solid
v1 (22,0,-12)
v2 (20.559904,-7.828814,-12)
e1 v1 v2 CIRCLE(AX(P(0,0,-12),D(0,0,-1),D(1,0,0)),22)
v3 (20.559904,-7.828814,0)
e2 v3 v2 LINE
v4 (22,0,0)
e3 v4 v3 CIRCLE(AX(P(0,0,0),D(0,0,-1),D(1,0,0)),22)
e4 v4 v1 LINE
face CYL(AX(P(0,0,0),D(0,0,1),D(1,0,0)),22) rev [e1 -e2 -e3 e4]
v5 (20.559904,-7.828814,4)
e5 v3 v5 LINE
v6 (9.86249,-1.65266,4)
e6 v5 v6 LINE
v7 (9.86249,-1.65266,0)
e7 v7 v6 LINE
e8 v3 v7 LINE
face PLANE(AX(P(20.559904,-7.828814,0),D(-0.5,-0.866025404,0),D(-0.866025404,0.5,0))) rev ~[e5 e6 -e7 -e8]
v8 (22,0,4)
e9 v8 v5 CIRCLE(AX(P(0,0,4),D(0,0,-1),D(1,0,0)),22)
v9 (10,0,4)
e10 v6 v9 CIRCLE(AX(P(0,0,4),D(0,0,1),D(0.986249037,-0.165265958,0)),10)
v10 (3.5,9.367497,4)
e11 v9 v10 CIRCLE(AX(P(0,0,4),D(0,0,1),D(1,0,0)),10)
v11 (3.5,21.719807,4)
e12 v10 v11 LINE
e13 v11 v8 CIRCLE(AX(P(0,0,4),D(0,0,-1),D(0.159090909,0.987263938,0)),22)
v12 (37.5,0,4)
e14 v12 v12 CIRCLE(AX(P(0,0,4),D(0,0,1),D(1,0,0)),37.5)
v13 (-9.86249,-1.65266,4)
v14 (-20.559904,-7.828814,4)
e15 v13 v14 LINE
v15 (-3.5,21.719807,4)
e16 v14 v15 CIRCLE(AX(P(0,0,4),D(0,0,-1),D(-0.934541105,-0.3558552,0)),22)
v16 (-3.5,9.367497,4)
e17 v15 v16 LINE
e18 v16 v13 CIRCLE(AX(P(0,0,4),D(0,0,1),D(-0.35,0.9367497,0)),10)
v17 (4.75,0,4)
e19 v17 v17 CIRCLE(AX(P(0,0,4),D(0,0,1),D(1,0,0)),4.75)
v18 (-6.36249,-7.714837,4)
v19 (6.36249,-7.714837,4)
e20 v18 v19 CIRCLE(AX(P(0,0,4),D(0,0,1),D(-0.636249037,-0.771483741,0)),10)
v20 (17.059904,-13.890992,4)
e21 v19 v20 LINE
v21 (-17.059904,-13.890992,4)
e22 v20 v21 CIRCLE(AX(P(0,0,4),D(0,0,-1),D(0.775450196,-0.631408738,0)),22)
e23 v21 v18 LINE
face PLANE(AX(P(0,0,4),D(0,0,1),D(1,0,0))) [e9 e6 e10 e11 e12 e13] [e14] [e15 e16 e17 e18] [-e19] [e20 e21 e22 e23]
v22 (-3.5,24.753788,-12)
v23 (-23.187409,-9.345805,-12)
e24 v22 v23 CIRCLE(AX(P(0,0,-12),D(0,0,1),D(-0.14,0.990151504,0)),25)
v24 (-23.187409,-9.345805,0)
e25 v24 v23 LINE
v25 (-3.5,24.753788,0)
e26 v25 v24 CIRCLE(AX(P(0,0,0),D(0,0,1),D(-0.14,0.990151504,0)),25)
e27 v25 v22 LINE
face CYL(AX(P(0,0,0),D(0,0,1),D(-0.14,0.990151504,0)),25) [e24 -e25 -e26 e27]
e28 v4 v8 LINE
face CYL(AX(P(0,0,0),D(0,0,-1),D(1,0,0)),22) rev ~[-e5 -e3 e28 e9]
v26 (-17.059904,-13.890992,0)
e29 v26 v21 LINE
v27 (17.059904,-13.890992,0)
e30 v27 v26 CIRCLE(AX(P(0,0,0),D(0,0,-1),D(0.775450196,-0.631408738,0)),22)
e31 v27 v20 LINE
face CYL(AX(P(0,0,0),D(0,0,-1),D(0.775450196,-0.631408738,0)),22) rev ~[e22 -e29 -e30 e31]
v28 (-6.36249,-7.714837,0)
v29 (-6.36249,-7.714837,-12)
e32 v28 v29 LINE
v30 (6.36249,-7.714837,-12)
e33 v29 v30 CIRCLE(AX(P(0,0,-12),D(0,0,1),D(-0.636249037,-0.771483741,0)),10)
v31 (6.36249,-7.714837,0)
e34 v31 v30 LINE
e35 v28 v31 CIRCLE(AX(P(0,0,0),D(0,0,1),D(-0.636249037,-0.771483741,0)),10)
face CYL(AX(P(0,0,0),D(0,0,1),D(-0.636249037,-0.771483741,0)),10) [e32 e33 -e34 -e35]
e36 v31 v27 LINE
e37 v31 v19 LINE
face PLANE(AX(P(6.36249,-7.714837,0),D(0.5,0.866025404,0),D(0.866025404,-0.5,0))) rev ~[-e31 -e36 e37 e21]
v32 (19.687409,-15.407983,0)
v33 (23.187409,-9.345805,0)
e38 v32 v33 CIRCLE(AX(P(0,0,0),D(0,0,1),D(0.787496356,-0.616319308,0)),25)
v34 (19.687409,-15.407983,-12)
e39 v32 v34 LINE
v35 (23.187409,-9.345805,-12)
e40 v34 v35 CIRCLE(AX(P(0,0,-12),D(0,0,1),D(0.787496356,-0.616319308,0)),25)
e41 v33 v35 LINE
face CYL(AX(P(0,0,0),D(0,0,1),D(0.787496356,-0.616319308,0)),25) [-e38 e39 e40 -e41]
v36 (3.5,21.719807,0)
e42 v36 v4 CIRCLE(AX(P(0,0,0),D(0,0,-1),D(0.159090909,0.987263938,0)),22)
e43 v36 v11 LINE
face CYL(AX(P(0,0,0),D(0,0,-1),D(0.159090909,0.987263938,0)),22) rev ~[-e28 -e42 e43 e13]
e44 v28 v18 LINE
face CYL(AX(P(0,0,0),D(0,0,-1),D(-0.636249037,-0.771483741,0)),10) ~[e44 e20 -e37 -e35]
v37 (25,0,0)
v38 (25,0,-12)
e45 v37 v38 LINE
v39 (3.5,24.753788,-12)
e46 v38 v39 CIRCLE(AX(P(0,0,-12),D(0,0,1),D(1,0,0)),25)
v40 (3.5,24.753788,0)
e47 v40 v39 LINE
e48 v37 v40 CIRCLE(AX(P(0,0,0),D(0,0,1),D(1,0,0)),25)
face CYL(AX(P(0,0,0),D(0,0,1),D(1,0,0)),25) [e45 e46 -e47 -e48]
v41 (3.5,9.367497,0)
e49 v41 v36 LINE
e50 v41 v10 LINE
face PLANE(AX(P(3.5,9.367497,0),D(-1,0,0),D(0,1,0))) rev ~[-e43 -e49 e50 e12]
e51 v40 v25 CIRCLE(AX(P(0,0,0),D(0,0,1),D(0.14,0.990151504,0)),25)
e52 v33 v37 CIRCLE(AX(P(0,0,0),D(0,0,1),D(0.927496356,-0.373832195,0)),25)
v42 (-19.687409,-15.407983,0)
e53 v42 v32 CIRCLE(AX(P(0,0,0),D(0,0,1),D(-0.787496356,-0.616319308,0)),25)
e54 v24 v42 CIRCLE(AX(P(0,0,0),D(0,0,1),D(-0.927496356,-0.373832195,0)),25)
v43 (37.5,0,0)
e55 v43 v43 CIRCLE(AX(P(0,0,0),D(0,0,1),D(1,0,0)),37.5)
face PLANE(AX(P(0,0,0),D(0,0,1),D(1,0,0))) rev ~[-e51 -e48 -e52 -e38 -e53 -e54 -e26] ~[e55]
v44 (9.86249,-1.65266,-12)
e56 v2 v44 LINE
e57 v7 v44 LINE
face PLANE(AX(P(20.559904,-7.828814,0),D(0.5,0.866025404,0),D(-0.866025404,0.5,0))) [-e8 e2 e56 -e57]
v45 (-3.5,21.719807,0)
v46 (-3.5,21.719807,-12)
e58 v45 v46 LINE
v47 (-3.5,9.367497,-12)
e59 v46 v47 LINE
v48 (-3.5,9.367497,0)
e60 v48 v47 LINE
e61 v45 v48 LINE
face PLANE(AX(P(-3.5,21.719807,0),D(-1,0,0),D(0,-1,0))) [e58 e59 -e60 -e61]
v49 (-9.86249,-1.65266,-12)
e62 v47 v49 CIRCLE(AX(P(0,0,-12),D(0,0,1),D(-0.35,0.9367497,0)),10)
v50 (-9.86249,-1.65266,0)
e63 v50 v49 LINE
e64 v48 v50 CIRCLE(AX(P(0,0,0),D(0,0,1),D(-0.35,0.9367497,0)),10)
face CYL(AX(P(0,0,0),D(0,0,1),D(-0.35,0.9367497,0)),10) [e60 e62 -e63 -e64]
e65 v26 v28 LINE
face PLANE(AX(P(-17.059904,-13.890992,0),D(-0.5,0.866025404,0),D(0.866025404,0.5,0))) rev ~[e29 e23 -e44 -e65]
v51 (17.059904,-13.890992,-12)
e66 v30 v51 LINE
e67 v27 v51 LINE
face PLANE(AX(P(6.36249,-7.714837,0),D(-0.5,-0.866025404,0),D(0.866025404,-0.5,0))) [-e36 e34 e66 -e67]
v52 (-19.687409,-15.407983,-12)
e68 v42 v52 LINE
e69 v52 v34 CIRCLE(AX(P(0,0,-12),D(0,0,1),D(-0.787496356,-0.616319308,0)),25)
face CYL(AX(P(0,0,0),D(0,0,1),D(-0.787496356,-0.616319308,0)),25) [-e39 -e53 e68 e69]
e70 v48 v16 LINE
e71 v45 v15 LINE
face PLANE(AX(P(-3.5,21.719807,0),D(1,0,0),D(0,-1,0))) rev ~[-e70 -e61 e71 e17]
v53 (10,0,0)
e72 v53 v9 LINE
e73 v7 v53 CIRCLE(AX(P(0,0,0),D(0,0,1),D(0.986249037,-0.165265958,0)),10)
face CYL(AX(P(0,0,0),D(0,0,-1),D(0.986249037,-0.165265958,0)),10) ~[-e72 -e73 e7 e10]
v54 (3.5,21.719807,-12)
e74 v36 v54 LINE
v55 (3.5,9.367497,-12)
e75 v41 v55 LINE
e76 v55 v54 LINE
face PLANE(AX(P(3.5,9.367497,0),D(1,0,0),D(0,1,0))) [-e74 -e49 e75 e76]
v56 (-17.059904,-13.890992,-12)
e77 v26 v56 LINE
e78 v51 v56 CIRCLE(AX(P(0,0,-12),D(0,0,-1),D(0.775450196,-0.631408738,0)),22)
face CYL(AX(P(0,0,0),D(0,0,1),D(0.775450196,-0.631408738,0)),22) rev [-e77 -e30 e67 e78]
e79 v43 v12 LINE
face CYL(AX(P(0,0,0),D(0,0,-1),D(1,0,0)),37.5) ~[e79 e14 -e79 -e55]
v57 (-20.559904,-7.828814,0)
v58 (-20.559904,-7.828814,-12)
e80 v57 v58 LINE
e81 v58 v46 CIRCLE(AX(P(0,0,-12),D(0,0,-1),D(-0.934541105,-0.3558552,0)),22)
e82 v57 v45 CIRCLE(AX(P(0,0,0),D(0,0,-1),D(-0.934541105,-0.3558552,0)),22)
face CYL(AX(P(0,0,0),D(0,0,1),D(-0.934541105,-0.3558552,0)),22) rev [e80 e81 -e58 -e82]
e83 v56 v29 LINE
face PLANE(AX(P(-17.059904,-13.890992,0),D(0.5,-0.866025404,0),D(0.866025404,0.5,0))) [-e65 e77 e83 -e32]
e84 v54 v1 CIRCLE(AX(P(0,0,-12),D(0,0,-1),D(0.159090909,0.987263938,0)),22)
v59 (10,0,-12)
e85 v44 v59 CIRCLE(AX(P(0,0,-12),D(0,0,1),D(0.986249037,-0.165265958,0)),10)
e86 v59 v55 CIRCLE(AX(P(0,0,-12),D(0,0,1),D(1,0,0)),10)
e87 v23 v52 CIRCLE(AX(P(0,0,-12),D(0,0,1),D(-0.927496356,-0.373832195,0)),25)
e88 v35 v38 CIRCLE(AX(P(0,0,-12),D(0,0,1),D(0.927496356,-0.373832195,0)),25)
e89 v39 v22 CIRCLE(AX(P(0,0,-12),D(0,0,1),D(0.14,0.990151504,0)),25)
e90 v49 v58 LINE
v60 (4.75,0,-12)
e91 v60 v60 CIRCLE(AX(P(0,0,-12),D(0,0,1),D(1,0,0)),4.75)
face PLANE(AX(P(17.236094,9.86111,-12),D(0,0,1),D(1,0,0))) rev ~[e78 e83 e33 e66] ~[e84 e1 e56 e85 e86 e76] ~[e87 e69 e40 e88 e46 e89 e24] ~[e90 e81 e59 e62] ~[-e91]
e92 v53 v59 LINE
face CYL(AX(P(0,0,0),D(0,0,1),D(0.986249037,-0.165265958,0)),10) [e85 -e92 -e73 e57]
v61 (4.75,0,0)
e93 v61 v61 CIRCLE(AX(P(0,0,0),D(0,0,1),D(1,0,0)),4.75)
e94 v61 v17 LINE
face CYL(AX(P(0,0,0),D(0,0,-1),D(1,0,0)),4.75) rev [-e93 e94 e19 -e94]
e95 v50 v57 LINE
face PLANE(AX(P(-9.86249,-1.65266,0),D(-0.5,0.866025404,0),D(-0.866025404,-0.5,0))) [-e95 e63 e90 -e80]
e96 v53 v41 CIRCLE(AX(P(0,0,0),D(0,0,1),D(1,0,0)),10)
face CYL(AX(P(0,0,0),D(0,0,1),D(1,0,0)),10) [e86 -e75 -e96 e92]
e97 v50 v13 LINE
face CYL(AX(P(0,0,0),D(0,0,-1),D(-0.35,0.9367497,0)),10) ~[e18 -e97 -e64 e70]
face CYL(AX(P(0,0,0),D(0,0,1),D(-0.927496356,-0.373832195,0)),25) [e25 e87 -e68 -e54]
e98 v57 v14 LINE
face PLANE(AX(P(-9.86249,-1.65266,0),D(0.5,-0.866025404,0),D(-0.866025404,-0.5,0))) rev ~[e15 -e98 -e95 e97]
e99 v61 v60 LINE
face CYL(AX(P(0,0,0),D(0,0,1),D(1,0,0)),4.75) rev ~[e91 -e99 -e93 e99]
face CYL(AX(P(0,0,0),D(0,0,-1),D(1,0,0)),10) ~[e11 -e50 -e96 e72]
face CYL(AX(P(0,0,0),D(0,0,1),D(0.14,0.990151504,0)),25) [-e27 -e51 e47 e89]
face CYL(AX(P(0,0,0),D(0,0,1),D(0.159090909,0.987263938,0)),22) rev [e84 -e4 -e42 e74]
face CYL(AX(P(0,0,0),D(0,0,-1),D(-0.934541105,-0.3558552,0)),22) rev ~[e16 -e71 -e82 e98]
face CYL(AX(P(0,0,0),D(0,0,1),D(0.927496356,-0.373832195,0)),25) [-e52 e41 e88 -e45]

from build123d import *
from build123d import SkipClean  # not in build123d's __all__

# Parameters (mm, degrees)
F0_R     = 37.5
F0_R_2   = 4.75
F1_DEPTH = 4
F2_DEPTH = 12


with BuildPart() as f1:
    # F0 (on Top) → F1 (new body)
    with BuildSketch(Plane.XY):
        Circle(F0_R)
        with BuildLine():
            ThreePointArc((3.5, 24.753787589), (18.8745860882, 16.3935963108), (25, 0))
            ThreePointArc((25, 0), (24.5426691937, -4.7599778204), (23.1874088919, -9.3458048812))
            ThreePointArc((23.1874088919, -9.3458048812), (21.6506350946, -12.5), (19.6874088919, -15.4079827077))
            ThreePointArc((19.6874088919, -15.4079827077), (0, -25), (-19.6874088919, -15.4079827077))
            ThreePointArc((-19.6874088919, -15.4079827077), (-21.6506350946, -12.5), (-23.1874088919, -9.3458048812))
            ThreePointArc((-23.1874088919, -9.3458048812), (-21.6506350946, 12.5), (-3.5, 24.753787589))
            ThreePointArc((-3.5, 24.753787589), (0, 25), (3.5, 24.753787589))
        make_face(mode=Mode.SUBTRACT)
        with BuildLine():
            Line((3.5, 21.719806629), (3.5, 24.753787589))
            ThreePointArc((3.5, 24.753787589), (0, 25), (-3.5, 24.753787589))
            Line((-3.5, 24.753787589), (-3.5, 21.719806629))
            ThreePointArc((-3.5, 21.719806629), (0, 22), (3.5, 21.719806629))
        make_face()
        with BuildLine():
            Line((3.5, 9.3674969976), (3.5, 21.719806629))
            ThreePointArc((3.5, 21.719806629), (0, 22), (-3.5, 21.719806629))
            Line((-3.5, 21.719806629), (-3.5, 9.3674969976))
            ThreePointArc((-3.5, 9.3674969976), (0, 10), (3.5, 9.3674969976))
        make_face()
        with BuildLine():
            ThreePointArc((17.059904306, -13.8909922277), (19.0525588833, -11), (20.559904306, -7.8288144012))
            Line((20.559904306, -7.8288144012), (9.8624903698, -1.6526595856))
            ThreePointArc((9.8624903698, -1.6526595856), (8.6602540378, -5), (6.3624903698, -7.714837412))
            Line((6.3624903698, -7.714837412), (17.059904306, -13.8909922277))
        make_face()
        with BuildLine():
            ThreePointArc((19.6874088919, -15.4079827077), (21.6506350946, -12.5), (23.1874088919, -9.3458048812))
            Line((23.1874088919, -9.3458048812), (20.559904306, -7.8288144012))
            ThreePointArc((20.559904306, -7.8288144012), (19.0525588833, -11), (17.059904306, -13.8909922277))
            Line((17.059904306, -13.8909922277), (19.6874088919, -15.4079827077))
        make_face()
        with BuildLine():
            Line((-9.8624903698, -1.6526595856), (-20.559904306, -7.8288144012))
            ThreePointArc((-20.559904306, -7.8288144012), (-19.0525588833, -11), (-17.059904306, -13.8909922277))
            Line((-17.059904306, -13.8909922277), (-6.3624903698, -7.714837412))
            ThreePointArc((-6.3624903698, -7.714837412), (-8.6602540378, -5), (-9.8624903698, -1.6526595856))
        make_face()
        with BuildLine():
            Line((-20.559904306, -7.8288144012), (-23.1874088919, -9.3458048812))
            ThreePointArc((-23.1874088919, -9.3458048812), (-21.6506350946, -12.5), (-19.6874088919, -15.4079827077))
            Line((-19.6874088919, -15.4079827077), (-17.059904306, -13.8909922277))
            ThreePointArc((-17.059904306, -13.8909922277), (-19.0525588833, -11), (-20.559904306, -7.8288144012))
        make_face()
        with BuildLine():
            ThreePointArc((10, 0), (8.2158383626, 5.7008771255), (3.5, 9.3674969976))
            ThreePointArc((3.5, 9.3674969976), (0, 10), (-3.5, 9.3674969976))
            ThreePointArc((-3.5, 9.3674969976), (-8.6602540378, 5), (-9.8624903698, -1.6526595856))
            ThreePointArc((-9.8624903698, -1.6526595856), (-8.6602540378, -5), (-6.3624903698, -7.714837412))
            ThreePointArc((-6.3624903698, -7.714837412), (0, -10), (6.3624903698, -7.714837412))
            ThreePointArc((6.3624903698, -7.714837412), (8.6602540378, -5), (9.8624903698, -1.6526595856))
            ThreePointArc((9.8624903698, -1.6526595856), (9.9655632981, -0.8291852332), (10, 0))
        make_face()
        Circle(F0_R_2, mode=Mode.SUBTRACT)
        with BuildLine():
            ThreePointArc((23.1874088919, -9.3458048812), (24.5426691937, -4.7599778204), (25, 0))
            ThreePointArc((25, 0), (18.8745860882, 16.3935963108), (3.5, 24.753787589))
            Line((3.5, 24.753787589), (3.5, 21.719806629))
            ThreePointArc((3.5, 21.719806629), (16.7481342244, 14.2653426177), (22, 0))
            ThreePointArc((22, 0), (21.6369810132, -3.9800819884), (20.559904306, -7.8288144012))
            Line((20.559904306, -7.8288144012), (23.1874088919, -9.3458048812))
        make_face()
        with BuildLine():
            ThreePointArc((-19.6874088919, -15.4079827077), (0, -25), (19.6874088919, -15.4079827077))
            Line((19.6874088919, -15.4079827077), (17.059904306, -13.8909922277))
            ThreePointArc((17.059904306, -13.8909922277), (0, -22), (-17.059904306, -13.8909922277))
            Line((-17.059904306, -13.8909922277), (-19.6874088919, -15.4079827077))
        make_face()
        with BuildLine():
            Line((-3.5, 21.719806629), (-3.5, 24.753787589))
            ThreePointArc((-3.5, 24.753787589), (-21.6506350946, 12.5), (-23.1874088919, -9.3458048812))
            Line((-23.1874088919, -9.3458048812), (-20.559904306, -7.8288144012))
            ThreePointArc((-20.559904306, -7.8288144012), (-19.0525588833, 11), (-3.5, 21.719806629))
        make_face()
    extrude(amount=F1_DEPTH)

    # F0 (on Top) → F2 (join)
    with BuildSketch(Plane.XY):
        with BuildLine():
            ThreePointArc((23.1874088919, -9.3458048812), (24.5426691937, -4.7599778204), (25, 0))
            ThreePointArc((25, 0), (18.8745860882, 16.3935963108), (3.5, 24.753787589))
            Line((3.5, 24.753787589), (3.5, 21.719806629))
            ThreePointArc((3.5, 21.719806629), (16.7481342244, 14.2653426177), (22, 0))
            ThreePointArc((22, 0), (21.6369810132, -3.9800819884), (20.559904306, -7.8288144012))
            Line((20.559904306, -7.8288144012), (23.1874088919, -9.3458048812))
        make_face()
        with BuildLine():
            Line((3.5, 21.719806629), (3.5, 24.753787589))
            ThreePointArc((3.5, 24.753787589), (0, 25), (-3.5, 24.753787589))
            Line((-3.5, 24.753787589), (-3.5, 21.719806629))
            ThreePointArc((-3.5, 21.719806629), (0, 22), (3.5, 21.719806629))
        make_face()
        with BuildLine():
            Line((-3.5, 21.719806629), (-3.5, 24.753787589))
            ThreePointArc((-3.5, 24.753787589), (-21.6506350946, 12.5), (-23.1874088919, -9.3458048812))
            Line((-23.1874088919, -9.3458048812), (-20.559904306, -7.8288144012))
            ThreePointArc((-20.559904306, -7.8288144012), (-19.0525588833, 11), (-3.5, 21.719806629))
        make_face()
        with BuildLine():
            Line((-20.559904306, -7.8288144012), (-23.1874088919, -9.3458048812))
            ThreePointArc((-23.1874088919, -9.3458048812), (-21.6506350946, -12.5), (-19.6874088919, -15.4079827077))
            Line((-19.6874088919, -15.4079827077), (-17.059904306, -13.8909922277))
            ThreePointArc((-17.059904306, -13.8909922277), (-19.0525588833, -11), (-20.559904306, -7.8288144012))
        make_face()
        with BuildLine():
            ThreePointArc((-19.6874088919, -15.4079827077), (0, -25), (19.6874088919, -15.4079827077))
            Line((19.6874088919, -15.4079827077), (17.059904306, -13.8909922277))
            ThreePointArc((17.059904306, -13.8909922277), (0, -22), (-17.059904306, -13.8909922277))
            Line((-17.059904306, -13.8909922277), (-19.6874088919, -15.4079827077))
        make_face()
        with BuildLine():
            ThreePointArc((19.6874088919, -15.4079827077), (21.6506350946, -12.5), (23.1874088919, -9.3458048812))
            Line((23.1874088919, -9.3458048812), (20.559904306, -7.8288144012))
            ThreePointArc((20.559904306, -7.8288144012), (19.0525588833, -11), (17.059904306, -13.8909922277))
            Line((17.059904306, -13.8909922277), (19.6874088919, -15.4079827077))
        make_face()
        with BuildLine():
            Line((3.5, 9.3674969976), (3.5, 21.719806629))
            ThreePointArc((3.5, 21.719806629), (0, 22), (-3.5, 21.719806629))
            Line((-3.5, 21.719806629), (-3.5, 9.3674969976))
            ThreePointArc((-3.5, 9.3674969976), (0, 10), (3.5, 9.3674969976))
        make_face()
        with BuildLine():
            ThreePointArc((17.059904306, -13.8909922277), (19.0525588833, -11), (20.559904306, -7.8288144012))
            Line((20.559904306, -7.8288144012), (9.8624903698, -1.6526595856))
            ThreePointArc((9.8624903698, -1.6526595856), (8.6602540378, -5), (6.3624903698, -7.714837412))
            Line((6.3624903698, -7.714837412), (17.059904306, -13.8909922277))
        make_face()
        with BuildLine():
            Line((-9.8624903698, -1.6526595856), (-20.559904306, -7.8288144012))
            ThreePointArc((-20.559904306, -7.8288144012), (-19.0525588833, -11), (-17.059904306, -13.8909922277))
            Line((-17.059904306, -13.8909922277), (-6.3624903698, -7.714837412))
            ThreePointArc((-6.3624903698, -7.714837412), (-8.6602540378, -5), (-9.8624903698, -1.6526595856))
        make_face()
        with BuildLine():
            ThreePointArc((10, 0), (8.2158383626, 5.7008771255), (3.5, 9.3674969976))
            ThreePointArc((3.5, 9.3674969976), (0, 10), (-3.5, 9.3674969976))
            ThreePointArc((-3.5, 9.3674969976), (-8.6602540378, 5), (-9.8624903698, -1.6526595856))
            ThreePointArc((-9.8624903698, -1.6526595856), (-8.6602540378, -5), (-6.3624903698, -7.714837412))
            ThreePointArc((-6.3624903698, -7.714837412), (0, -10), (6.3624903698, -7.714837412))
            ThreePointArc((6.3624903698, -7.714837412), (8.6602540378, -5), (9.8624903698, -1.6526595856))
            ThreePointArc((9.8624903698, -1.6526595856), (9.9655632981, -0.8291852332), (10, 0))
        make_face()
        Circle(F0_R_2, mode=Mode.SUBTRACT)
    with SkipClean():  # cleaning this boolean's faces spoils the solid; the shape is the same uncleaned
        extrude(amount=-F2_DEPTH)


solid = f1.part
